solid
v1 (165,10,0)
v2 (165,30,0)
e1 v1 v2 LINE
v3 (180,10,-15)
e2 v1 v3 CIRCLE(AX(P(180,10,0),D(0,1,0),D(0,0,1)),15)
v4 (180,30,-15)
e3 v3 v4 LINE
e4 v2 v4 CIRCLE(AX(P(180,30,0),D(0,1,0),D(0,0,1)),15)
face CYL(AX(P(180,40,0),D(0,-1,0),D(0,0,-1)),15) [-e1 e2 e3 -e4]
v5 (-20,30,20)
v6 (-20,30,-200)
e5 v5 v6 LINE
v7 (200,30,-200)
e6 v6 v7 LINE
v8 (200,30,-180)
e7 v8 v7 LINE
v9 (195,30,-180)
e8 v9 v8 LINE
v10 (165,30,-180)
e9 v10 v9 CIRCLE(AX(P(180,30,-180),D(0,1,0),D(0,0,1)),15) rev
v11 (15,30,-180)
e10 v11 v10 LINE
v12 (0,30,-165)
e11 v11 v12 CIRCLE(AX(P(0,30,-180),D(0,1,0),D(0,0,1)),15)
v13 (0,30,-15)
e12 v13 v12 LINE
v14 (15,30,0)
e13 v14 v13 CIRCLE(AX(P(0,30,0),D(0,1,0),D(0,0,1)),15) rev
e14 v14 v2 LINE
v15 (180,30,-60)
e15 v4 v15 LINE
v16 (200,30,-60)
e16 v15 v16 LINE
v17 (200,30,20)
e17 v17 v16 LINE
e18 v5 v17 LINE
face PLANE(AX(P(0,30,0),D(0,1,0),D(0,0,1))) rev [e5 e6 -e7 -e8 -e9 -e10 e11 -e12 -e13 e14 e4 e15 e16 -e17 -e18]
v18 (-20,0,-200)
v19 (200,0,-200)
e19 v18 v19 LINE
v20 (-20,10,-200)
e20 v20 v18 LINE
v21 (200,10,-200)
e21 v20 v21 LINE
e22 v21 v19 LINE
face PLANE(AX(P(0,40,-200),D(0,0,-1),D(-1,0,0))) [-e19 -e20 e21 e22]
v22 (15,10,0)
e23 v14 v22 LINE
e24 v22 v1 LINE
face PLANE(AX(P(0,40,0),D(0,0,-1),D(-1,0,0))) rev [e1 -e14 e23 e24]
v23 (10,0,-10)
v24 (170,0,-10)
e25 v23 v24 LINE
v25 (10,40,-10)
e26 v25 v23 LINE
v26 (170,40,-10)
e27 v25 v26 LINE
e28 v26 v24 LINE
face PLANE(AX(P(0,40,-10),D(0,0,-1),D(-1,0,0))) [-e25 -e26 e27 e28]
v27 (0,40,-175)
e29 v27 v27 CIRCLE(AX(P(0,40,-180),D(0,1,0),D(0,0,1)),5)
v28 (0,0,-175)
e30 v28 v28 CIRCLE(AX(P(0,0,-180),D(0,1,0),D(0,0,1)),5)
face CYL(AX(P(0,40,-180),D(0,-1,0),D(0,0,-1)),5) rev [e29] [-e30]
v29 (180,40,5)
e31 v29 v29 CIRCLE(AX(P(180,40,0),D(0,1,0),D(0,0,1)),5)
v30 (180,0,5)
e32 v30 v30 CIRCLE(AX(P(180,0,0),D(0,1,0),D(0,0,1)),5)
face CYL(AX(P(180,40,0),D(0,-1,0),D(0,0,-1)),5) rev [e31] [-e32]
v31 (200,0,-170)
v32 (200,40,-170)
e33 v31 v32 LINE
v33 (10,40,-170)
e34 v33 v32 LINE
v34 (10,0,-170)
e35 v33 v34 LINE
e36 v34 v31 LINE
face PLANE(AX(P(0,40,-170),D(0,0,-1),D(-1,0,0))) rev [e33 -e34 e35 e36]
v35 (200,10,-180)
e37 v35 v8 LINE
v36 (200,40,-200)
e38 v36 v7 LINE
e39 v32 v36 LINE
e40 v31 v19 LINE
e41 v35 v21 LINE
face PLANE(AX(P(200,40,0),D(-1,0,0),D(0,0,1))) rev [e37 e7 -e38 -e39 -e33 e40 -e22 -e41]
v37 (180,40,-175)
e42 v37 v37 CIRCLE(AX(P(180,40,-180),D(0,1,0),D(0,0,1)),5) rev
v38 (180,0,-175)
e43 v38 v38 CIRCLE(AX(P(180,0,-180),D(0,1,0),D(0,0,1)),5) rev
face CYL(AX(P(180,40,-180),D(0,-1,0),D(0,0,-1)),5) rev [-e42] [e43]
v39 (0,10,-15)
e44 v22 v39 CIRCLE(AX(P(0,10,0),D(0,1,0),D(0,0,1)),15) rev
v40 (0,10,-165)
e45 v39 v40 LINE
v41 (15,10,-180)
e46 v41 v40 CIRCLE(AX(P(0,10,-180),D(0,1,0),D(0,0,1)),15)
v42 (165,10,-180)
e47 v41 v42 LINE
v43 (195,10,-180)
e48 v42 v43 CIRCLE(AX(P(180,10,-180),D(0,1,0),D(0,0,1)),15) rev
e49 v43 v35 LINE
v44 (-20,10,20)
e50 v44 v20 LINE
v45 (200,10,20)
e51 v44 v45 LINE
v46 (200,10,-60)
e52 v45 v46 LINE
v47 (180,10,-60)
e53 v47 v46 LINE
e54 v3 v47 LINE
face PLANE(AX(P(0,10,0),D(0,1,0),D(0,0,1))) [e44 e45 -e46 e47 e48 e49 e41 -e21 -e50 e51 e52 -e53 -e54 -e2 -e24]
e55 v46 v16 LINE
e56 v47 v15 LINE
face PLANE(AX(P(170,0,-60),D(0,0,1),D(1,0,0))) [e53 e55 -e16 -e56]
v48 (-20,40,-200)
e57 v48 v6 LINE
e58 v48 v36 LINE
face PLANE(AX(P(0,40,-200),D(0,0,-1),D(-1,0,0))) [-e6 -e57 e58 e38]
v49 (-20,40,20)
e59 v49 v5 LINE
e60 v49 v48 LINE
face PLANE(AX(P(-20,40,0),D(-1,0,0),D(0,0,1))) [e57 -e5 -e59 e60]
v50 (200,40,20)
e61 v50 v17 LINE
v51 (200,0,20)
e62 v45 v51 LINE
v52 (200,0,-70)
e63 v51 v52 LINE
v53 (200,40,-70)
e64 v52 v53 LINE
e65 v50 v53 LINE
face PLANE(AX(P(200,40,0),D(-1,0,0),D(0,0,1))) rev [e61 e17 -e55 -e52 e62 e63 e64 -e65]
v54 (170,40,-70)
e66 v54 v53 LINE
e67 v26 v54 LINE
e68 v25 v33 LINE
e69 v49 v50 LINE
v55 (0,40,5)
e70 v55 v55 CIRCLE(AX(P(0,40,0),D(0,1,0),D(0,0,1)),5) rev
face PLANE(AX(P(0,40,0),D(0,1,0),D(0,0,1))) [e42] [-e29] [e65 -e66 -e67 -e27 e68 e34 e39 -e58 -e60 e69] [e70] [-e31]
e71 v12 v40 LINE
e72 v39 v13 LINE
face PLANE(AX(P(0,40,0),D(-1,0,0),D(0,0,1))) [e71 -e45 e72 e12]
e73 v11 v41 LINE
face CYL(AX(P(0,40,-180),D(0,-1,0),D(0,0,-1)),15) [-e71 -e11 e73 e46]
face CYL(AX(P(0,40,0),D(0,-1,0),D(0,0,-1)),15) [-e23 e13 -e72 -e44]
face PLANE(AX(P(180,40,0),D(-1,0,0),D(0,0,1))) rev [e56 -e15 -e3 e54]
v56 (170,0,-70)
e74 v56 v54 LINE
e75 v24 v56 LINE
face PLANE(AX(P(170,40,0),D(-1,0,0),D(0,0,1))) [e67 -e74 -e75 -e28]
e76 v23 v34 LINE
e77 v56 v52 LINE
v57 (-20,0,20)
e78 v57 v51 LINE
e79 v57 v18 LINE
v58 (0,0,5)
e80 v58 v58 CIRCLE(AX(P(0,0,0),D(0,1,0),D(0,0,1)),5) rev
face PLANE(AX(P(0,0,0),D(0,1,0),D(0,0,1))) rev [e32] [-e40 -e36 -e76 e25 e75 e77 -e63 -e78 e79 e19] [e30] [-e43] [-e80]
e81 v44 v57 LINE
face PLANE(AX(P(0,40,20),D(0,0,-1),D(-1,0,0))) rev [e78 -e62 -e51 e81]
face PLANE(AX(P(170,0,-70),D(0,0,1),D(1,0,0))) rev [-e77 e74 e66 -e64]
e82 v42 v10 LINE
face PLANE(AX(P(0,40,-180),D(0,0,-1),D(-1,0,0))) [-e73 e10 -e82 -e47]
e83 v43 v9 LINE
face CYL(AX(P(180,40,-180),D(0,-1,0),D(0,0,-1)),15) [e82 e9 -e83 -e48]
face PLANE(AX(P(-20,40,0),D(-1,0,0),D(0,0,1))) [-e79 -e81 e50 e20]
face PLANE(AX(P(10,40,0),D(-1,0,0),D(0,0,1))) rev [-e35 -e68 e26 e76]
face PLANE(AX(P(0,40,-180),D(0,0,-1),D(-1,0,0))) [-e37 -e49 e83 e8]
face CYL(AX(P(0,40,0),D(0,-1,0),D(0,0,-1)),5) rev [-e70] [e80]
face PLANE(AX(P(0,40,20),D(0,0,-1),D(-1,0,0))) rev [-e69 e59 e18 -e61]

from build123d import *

# Parameters (mm, degrees)
SKETCH1_W           = 220
SKETCH1_H           = 220
SKETCH1_R           = 5
SKETCH1_W_2         = 160
SKETCH1_H_2         = 160
BOSS_EXTRUDE1_DEPTH = 40
SKETCH4_W           = 30
SKETCH4_H           = 100
CUT_EXTRUDE1_DEPTH  = 286.657137142
SHELL1_START        = 10
SHELL1_DEPTH        = 20


# Read off the part's stored shape, not the designer's step: Shell1
with BuildPart() as part:
    # Sketch1 → Boss-Extrude1 (new body)
    with BuildSketch(Plane(origin=(0, 0, 0), x_dir=(1, 0, 0), z_dir=(0, 1, 0))):
        with Locations((90, 90)):
            Rectangle(SKETCH1_W, SKETCH1_H)
        with Locations(Location((0, 180, 0), (0, 0, 270))):
            Circle(SKETCH1_R, mode=Mode.SUBTRACT)
        with Locations(Location((180, 180, 0), (0, 0, 270))):
            Circle(SKETCH1_R, mode=Mode.SUBTRACT)
        with Locations(Location((180, 0, 0), (0, 0, 270))):
            Circle(SKETCH1_R, mode=Mode.SUBTRACT)
        with Locations(Location((0, 0, 0), (0, 0, 270))):
            Circle(SKETCH1_R, mode=Mode.SUBTRACT)
        with Locations((90, 90)):
            Rectangle(SKETCH1_W_2, SKETCH1_H_2, mode=Mode.SUBTRACT)
    extrude(amount=BOSS_EXTRUDE1_DEPTH)

    # Sketch4 → Cut-Extrude1 (cut, through all)
    with BuildSketch(Plane(origin=(0, 40, 0), x_dir=(1, 0, 0), z_dir=(0, 1, 0))):
        with Locations((185, 120)):
            Rectangle(SKETCH4_W, SKETCH4_H)
    extrude(amount=-CUT_EXTRUDE1_DEPTH, mode=Mode.SUBTRACT)

    # Shell1 outline → Shell1 (cut)
    with BuildSketch(Plane(origin=(0, 0, 0), x_dir=(1, 0, 0), z_dir=(0, 1, 0)).offset(SHELL1_START)):
        with BuildLine():
            Line((15, 180), (165, 180))
            ThreePointArc((165, 180), (180, 195), (195, 180))
            Line((195, 180), (200, 180))
            Line((200, 180), (200, 200))
            Line((200, 200), (-20, 200))
            Line((-20, 200), (-20, -20))
            Line((-20, -20), (200, -20))
            Line((200, -20), (200, 60))
            Line((200, 60), (180, 60))
            Line((180, 60), (180, 15))
            ThreePointArc((180, 15), (190.606601718, -10.606601718), (165, 0))
            Line((165, 0), (15, 0))
            ThreePointArc((15, 0), (-10.606601718, -10.606601718), (0, 15))
            Line((0, 15), (0, 165))
            ThreePointArc((0, 165), (-10.606601718, 190.606601718), (15, 180))
        make_face()
    extrude(amount=SHELL1_DEPTH, mode=Mode.SUBTRACT)


solid = part.part
